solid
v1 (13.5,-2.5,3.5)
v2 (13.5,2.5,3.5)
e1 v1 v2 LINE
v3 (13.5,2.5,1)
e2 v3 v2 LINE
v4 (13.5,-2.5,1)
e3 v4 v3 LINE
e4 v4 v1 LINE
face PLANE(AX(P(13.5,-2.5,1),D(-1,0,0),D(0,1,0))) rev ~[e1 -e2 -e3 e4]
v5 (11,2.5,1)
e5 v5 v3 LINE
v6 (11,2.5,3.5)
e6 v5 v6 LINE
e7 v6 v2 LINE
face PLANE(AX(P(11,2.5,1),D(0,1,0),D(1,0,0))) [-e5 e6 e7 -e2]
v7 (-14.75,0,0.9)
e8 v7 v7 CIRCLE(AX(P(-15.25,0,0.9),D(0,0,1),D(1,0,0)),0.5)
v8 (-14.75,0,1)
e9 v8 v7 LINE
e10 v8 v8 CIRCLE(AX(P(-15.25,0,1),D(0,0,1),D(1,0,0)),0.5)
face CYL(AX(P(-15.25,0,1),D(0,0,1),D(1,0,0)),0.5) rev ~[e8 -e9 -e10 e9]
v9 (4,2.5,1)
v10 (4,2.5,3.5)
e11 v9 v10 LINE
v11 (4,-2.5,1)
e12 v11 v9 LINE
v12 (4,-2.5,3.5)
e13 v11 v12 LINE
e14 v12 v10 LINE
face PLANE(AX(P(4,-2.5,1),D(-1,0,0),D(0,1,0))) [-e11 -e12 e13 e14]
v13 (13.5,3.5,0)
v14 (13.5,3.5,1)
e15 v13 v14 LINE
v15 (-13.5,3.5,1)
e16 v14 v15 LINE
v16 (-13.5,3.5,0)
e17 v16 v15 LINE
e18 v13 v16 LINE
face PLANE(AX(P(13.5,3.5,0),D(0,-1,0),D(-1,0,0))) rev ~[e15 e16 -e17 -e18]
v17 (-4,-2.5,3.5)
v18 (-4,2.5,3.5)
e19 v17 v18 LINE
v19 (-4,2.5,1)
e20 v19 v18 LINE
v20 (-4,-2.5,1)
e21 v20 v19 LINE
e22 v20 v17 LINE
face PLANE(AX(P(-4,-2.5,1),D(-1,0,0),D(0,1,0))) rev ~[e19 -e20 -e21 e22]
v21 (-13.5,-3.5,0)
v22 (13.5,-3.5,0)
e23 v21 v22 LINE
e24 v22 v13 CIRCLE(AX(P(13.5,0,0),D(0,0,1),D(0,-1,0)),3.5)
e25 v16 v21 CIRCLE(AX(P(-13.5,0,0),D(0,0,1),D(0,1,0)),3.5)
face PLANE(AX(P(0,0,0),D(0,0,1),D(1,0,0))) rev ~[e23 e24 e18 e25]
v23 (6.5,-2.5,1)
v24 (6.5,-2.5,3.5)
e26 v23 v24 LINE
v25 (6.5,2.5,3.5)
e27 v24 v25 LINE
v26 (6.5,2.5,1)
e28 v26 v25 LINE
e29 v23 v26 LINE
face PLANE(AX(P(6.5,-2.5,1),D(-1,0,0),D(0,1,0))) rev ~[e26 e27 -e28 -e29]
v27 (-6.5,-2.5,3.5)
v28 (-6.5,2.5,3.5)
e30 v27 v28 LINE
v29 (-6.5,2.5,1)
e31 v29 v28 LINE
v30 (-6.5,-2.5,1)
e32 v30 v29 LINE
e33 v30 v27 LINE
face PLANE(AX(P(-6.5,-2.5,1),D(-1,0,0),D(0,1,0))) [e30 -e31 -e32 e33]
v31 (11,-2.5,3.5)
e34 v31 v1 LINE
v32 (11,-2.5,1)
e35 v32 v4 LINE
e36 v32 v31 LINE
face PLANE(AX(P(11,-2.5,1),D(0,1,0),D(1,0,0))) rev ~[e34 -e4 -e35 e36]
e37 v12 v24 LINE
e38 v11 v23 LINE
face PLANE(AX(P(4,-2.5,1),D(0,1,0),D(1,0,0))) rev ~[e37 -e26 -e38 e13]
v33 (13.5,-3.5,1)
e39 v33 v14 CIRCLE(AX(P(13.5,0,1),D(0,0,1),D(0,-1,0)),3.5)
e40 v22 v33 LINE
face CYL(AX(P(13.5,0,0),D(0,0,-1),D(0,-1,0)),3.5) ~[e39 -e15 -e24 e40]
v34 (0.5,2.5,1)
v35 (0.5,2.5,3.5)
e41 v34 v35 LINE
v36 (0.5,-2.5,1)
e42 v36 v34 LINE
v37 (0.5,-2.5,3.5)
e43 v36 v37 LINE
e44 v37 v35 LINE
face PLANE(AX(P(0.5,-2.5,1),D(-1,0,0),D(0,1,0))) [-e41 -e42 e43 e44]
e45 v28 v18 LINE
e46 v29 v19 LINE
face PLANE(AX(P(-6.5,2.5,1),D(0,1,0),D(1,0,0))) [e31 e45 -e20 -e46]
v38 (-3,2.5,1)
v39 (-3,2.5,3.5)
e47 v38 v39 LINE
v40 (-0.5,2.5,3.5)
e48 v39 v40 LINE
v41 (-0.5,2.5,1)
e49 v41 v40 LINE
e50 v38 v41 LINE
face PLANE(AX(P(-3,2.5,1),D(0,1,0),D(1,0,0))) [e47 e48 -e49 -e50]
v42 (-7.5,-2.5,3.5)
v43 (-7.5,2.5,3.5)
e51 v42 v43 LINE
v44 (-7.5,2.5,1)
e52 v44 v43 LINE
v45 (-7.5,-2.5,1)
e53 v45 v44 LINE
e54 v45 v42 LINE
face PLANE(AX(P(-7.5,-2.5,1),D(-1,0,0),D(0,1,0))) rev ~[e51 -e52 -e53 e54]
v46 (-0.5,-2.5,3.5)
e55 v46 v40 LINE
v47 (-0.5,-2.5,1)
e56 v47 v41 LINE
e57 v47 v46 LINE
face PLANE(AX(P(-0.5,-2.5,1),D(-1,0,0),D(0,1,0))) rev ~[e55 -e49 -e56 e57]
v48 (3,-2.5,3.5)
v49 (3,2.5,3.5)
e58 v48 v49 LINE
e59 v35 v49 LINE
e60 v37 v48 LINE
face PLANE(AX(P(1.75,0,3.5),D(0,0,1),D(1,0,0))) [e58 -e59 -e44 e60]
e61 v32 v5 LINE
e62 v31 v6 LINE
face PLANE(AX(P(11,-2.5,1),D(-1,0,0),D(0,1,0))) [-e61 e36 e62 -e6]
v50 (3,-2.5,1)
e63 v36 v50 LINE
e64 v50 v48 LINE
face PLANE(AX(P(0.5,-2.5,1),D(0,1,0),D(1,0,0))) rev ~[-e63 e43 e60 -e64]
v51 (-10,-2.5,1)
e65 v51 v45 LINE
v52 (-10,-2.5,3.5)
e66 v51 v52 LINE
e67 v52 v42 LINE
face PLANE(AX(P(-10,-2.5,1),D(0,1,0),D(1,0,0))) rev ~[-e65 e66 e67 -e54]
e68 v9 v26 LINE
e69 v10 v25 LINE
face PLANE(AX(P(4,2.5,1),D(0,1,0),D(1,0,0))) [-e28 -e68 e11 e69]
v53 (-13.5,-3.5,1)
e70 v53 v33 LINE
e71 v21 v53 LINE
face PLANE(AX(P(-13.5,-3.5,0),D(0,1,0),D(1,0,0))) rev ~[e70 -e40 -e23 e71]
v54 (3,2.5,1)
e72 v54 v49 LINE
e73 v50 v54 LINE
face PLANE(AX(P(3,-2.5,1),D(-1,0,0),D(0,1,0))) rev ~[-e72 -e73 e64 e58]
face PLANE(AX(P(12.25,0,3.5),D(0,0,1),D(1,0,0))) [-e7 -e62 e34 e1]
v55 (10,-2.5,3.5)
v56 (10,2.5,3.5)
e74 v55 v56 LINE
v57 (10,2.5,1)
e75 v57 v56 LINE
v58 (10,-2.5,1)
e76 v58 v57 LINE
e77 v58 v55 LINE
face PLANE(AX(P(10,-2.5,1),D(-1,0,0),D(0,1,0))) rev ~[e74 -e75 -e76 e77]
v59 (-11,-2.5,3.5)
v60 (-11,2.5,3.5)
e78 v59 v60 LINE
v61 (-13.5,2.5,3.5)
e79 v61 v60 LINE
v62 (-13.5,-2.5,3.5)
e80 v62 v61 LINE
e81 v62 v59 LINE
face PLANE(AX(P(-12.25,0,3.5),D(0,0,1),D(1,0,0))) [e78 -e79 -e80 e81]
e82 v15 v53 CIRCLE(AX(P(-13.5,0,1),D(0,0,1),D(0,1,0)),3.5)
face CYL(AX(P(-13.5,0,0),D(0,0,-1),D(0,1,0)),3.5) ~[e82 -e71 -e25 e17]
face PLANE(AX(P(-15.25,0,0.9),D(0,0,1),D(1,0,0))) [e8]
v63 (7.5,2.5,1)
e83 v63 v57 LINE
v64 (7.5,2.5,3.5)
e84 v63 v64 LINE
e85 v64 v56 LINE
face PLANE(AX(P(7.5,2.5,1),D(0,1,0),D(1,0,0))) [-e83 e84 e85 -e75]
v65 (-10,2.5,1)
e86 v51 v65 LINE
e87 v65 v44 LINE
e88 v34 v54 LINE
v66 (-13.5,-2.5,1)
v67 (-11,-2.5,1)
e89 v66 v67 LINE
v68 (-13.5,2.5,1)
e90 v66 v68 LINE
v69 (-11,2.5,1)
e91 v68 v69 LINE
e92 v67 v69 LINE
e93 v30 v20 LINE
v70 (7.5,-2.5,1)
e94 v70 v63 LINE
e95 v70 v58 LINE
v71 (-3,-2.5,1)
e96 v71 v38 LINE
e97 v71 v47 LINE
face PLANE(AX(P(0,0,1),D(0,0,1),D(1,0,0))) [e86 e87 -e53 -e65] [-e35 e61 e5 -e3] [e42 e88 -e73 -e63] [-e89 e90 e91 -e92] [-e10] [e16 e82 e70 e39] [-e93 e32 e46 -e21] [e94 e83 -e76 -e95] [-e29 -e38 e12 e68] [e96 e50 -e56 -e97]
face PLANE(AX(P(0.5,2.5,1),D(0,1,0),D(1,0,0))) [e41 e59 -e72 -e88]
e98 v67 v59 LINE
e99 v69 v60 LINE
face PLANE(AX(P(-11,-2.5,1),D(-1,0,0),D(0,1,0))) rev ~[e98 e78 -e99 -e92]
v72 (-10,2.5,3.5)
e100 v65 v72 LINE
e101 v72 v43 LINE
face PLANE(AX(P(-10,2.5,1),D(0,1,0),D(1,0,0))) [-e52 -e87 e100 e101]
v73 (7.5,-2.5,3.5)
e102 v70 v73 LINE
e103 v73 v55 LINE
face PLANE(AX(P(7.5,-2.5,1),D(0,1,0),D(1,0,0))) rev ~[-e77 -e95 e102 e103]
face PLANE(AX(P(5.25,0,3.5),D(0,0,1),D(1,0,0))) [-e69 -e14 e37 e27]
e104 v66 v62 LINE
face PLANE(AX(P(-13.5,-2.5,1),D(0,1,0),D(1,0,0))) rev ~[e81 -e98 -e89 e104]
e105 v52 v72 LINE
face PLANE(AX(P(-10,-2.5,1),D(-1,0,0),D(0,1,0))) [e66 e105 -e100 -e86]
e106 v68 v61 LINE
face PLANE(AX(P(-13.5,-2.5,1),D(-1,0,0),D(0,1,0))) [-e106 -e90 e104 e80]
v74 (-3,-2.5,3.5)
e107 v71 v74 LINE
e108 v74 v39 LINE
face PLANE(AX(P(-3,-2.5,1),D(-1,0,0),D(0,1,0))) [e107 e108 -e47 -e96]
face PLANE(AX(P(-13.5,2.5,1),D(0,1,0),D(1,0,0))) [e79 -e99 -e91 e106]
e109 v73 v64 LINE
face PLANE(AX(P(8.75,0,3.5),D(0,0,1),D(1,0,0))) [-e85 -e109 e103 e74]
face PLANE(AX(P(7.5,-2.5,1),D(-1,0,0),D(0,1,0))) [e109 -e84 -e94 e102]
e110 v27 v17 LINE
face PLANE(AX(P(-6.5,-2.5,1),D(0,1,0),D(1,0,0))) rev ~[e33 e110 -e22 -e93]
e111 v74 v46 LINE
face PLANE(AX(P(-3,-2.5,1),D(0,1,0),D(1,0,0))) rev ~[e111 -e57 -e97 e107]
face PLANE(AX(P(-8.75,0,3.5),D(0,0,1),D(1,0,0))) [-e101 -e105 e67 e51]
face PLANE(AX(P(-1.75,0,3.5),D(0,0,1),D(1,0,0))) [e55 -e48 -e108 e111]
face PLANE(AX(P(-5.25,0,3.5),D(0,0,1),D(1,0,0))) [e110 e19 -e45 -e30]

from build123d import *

# Parameters (mm, degrees)
F1_DEPTH = 1
F2_W     = 2.5
F2_H     = 5
F3_DEPTH = 2.5
F5_DEPTH = 0.1


# Not quite as in the source:
# - a feature names something its author has since deleted; it is built from what else it names


with BuildPart() as f1:
    # F0 (on Top) → F1 (new body)
    with BuildSketch(Plane.XY):
        with BuildLine():
            Line((0, 3.5), (-13.5, 3.5))
            ThreePointArc((-13.5, 3.5), (-17, 0), (-13.5, -3.5))
            Line((-13.5, -3.5), (0, -3.5))
            Line((0, -3.5), (13.5, -3.5))
            ThreePointArc((13.5, -3.5), (17, 0), (13.5, 3.5))
            Line((13.5, 3.5), (0, 3.5))
        make_face()
    extrude(amount=F1_DEPTH)

    # F2 (on face) → F3 (join)
    with BuildSketch(Plane.XY.offset(1)):
        with Locations((-12.25, 0)):
            Rectangle(F2_W, F2_H)
        with Locations((12.25, 0)):
            Rectangle(F2_W, F2_H)
        with Locations((-8.75, 0)):
            Rectangle(F2_W, F2_H)
        with Locations((-5.25, 0)):
            Rectangle(F2_W, F2_H)
        with Locations((-1.75, 0)):
            Rectangle(F2_W, F2_H)
        with Locations((1.75, 0)):
            Rectangle(F2_W, F2_H)
        with Locations((5.25, 0)):
            Rectangle(F2_W, F2_H)
        with Locations((8.75, 0)):
            Rectangle(F2_W, F2_H)
    extrude(amount=F3_DEPTH)

    # F4 (on face) → F5 (cut)
    with BuildSketch(Plane.XY.offset(1)):
        with BuildLine():
            ThreePointArc((-15.75, 0), (-15.25, -0.5), (-14.75, 0))
            ThreePointArc((-14.75, 0), (-15.25, 0.5), (-15.75, 0))
        make_face()
    extrude(amount=-F5_DEPTH, mode=Mode.SUBTRACT)


solid = f1.part
